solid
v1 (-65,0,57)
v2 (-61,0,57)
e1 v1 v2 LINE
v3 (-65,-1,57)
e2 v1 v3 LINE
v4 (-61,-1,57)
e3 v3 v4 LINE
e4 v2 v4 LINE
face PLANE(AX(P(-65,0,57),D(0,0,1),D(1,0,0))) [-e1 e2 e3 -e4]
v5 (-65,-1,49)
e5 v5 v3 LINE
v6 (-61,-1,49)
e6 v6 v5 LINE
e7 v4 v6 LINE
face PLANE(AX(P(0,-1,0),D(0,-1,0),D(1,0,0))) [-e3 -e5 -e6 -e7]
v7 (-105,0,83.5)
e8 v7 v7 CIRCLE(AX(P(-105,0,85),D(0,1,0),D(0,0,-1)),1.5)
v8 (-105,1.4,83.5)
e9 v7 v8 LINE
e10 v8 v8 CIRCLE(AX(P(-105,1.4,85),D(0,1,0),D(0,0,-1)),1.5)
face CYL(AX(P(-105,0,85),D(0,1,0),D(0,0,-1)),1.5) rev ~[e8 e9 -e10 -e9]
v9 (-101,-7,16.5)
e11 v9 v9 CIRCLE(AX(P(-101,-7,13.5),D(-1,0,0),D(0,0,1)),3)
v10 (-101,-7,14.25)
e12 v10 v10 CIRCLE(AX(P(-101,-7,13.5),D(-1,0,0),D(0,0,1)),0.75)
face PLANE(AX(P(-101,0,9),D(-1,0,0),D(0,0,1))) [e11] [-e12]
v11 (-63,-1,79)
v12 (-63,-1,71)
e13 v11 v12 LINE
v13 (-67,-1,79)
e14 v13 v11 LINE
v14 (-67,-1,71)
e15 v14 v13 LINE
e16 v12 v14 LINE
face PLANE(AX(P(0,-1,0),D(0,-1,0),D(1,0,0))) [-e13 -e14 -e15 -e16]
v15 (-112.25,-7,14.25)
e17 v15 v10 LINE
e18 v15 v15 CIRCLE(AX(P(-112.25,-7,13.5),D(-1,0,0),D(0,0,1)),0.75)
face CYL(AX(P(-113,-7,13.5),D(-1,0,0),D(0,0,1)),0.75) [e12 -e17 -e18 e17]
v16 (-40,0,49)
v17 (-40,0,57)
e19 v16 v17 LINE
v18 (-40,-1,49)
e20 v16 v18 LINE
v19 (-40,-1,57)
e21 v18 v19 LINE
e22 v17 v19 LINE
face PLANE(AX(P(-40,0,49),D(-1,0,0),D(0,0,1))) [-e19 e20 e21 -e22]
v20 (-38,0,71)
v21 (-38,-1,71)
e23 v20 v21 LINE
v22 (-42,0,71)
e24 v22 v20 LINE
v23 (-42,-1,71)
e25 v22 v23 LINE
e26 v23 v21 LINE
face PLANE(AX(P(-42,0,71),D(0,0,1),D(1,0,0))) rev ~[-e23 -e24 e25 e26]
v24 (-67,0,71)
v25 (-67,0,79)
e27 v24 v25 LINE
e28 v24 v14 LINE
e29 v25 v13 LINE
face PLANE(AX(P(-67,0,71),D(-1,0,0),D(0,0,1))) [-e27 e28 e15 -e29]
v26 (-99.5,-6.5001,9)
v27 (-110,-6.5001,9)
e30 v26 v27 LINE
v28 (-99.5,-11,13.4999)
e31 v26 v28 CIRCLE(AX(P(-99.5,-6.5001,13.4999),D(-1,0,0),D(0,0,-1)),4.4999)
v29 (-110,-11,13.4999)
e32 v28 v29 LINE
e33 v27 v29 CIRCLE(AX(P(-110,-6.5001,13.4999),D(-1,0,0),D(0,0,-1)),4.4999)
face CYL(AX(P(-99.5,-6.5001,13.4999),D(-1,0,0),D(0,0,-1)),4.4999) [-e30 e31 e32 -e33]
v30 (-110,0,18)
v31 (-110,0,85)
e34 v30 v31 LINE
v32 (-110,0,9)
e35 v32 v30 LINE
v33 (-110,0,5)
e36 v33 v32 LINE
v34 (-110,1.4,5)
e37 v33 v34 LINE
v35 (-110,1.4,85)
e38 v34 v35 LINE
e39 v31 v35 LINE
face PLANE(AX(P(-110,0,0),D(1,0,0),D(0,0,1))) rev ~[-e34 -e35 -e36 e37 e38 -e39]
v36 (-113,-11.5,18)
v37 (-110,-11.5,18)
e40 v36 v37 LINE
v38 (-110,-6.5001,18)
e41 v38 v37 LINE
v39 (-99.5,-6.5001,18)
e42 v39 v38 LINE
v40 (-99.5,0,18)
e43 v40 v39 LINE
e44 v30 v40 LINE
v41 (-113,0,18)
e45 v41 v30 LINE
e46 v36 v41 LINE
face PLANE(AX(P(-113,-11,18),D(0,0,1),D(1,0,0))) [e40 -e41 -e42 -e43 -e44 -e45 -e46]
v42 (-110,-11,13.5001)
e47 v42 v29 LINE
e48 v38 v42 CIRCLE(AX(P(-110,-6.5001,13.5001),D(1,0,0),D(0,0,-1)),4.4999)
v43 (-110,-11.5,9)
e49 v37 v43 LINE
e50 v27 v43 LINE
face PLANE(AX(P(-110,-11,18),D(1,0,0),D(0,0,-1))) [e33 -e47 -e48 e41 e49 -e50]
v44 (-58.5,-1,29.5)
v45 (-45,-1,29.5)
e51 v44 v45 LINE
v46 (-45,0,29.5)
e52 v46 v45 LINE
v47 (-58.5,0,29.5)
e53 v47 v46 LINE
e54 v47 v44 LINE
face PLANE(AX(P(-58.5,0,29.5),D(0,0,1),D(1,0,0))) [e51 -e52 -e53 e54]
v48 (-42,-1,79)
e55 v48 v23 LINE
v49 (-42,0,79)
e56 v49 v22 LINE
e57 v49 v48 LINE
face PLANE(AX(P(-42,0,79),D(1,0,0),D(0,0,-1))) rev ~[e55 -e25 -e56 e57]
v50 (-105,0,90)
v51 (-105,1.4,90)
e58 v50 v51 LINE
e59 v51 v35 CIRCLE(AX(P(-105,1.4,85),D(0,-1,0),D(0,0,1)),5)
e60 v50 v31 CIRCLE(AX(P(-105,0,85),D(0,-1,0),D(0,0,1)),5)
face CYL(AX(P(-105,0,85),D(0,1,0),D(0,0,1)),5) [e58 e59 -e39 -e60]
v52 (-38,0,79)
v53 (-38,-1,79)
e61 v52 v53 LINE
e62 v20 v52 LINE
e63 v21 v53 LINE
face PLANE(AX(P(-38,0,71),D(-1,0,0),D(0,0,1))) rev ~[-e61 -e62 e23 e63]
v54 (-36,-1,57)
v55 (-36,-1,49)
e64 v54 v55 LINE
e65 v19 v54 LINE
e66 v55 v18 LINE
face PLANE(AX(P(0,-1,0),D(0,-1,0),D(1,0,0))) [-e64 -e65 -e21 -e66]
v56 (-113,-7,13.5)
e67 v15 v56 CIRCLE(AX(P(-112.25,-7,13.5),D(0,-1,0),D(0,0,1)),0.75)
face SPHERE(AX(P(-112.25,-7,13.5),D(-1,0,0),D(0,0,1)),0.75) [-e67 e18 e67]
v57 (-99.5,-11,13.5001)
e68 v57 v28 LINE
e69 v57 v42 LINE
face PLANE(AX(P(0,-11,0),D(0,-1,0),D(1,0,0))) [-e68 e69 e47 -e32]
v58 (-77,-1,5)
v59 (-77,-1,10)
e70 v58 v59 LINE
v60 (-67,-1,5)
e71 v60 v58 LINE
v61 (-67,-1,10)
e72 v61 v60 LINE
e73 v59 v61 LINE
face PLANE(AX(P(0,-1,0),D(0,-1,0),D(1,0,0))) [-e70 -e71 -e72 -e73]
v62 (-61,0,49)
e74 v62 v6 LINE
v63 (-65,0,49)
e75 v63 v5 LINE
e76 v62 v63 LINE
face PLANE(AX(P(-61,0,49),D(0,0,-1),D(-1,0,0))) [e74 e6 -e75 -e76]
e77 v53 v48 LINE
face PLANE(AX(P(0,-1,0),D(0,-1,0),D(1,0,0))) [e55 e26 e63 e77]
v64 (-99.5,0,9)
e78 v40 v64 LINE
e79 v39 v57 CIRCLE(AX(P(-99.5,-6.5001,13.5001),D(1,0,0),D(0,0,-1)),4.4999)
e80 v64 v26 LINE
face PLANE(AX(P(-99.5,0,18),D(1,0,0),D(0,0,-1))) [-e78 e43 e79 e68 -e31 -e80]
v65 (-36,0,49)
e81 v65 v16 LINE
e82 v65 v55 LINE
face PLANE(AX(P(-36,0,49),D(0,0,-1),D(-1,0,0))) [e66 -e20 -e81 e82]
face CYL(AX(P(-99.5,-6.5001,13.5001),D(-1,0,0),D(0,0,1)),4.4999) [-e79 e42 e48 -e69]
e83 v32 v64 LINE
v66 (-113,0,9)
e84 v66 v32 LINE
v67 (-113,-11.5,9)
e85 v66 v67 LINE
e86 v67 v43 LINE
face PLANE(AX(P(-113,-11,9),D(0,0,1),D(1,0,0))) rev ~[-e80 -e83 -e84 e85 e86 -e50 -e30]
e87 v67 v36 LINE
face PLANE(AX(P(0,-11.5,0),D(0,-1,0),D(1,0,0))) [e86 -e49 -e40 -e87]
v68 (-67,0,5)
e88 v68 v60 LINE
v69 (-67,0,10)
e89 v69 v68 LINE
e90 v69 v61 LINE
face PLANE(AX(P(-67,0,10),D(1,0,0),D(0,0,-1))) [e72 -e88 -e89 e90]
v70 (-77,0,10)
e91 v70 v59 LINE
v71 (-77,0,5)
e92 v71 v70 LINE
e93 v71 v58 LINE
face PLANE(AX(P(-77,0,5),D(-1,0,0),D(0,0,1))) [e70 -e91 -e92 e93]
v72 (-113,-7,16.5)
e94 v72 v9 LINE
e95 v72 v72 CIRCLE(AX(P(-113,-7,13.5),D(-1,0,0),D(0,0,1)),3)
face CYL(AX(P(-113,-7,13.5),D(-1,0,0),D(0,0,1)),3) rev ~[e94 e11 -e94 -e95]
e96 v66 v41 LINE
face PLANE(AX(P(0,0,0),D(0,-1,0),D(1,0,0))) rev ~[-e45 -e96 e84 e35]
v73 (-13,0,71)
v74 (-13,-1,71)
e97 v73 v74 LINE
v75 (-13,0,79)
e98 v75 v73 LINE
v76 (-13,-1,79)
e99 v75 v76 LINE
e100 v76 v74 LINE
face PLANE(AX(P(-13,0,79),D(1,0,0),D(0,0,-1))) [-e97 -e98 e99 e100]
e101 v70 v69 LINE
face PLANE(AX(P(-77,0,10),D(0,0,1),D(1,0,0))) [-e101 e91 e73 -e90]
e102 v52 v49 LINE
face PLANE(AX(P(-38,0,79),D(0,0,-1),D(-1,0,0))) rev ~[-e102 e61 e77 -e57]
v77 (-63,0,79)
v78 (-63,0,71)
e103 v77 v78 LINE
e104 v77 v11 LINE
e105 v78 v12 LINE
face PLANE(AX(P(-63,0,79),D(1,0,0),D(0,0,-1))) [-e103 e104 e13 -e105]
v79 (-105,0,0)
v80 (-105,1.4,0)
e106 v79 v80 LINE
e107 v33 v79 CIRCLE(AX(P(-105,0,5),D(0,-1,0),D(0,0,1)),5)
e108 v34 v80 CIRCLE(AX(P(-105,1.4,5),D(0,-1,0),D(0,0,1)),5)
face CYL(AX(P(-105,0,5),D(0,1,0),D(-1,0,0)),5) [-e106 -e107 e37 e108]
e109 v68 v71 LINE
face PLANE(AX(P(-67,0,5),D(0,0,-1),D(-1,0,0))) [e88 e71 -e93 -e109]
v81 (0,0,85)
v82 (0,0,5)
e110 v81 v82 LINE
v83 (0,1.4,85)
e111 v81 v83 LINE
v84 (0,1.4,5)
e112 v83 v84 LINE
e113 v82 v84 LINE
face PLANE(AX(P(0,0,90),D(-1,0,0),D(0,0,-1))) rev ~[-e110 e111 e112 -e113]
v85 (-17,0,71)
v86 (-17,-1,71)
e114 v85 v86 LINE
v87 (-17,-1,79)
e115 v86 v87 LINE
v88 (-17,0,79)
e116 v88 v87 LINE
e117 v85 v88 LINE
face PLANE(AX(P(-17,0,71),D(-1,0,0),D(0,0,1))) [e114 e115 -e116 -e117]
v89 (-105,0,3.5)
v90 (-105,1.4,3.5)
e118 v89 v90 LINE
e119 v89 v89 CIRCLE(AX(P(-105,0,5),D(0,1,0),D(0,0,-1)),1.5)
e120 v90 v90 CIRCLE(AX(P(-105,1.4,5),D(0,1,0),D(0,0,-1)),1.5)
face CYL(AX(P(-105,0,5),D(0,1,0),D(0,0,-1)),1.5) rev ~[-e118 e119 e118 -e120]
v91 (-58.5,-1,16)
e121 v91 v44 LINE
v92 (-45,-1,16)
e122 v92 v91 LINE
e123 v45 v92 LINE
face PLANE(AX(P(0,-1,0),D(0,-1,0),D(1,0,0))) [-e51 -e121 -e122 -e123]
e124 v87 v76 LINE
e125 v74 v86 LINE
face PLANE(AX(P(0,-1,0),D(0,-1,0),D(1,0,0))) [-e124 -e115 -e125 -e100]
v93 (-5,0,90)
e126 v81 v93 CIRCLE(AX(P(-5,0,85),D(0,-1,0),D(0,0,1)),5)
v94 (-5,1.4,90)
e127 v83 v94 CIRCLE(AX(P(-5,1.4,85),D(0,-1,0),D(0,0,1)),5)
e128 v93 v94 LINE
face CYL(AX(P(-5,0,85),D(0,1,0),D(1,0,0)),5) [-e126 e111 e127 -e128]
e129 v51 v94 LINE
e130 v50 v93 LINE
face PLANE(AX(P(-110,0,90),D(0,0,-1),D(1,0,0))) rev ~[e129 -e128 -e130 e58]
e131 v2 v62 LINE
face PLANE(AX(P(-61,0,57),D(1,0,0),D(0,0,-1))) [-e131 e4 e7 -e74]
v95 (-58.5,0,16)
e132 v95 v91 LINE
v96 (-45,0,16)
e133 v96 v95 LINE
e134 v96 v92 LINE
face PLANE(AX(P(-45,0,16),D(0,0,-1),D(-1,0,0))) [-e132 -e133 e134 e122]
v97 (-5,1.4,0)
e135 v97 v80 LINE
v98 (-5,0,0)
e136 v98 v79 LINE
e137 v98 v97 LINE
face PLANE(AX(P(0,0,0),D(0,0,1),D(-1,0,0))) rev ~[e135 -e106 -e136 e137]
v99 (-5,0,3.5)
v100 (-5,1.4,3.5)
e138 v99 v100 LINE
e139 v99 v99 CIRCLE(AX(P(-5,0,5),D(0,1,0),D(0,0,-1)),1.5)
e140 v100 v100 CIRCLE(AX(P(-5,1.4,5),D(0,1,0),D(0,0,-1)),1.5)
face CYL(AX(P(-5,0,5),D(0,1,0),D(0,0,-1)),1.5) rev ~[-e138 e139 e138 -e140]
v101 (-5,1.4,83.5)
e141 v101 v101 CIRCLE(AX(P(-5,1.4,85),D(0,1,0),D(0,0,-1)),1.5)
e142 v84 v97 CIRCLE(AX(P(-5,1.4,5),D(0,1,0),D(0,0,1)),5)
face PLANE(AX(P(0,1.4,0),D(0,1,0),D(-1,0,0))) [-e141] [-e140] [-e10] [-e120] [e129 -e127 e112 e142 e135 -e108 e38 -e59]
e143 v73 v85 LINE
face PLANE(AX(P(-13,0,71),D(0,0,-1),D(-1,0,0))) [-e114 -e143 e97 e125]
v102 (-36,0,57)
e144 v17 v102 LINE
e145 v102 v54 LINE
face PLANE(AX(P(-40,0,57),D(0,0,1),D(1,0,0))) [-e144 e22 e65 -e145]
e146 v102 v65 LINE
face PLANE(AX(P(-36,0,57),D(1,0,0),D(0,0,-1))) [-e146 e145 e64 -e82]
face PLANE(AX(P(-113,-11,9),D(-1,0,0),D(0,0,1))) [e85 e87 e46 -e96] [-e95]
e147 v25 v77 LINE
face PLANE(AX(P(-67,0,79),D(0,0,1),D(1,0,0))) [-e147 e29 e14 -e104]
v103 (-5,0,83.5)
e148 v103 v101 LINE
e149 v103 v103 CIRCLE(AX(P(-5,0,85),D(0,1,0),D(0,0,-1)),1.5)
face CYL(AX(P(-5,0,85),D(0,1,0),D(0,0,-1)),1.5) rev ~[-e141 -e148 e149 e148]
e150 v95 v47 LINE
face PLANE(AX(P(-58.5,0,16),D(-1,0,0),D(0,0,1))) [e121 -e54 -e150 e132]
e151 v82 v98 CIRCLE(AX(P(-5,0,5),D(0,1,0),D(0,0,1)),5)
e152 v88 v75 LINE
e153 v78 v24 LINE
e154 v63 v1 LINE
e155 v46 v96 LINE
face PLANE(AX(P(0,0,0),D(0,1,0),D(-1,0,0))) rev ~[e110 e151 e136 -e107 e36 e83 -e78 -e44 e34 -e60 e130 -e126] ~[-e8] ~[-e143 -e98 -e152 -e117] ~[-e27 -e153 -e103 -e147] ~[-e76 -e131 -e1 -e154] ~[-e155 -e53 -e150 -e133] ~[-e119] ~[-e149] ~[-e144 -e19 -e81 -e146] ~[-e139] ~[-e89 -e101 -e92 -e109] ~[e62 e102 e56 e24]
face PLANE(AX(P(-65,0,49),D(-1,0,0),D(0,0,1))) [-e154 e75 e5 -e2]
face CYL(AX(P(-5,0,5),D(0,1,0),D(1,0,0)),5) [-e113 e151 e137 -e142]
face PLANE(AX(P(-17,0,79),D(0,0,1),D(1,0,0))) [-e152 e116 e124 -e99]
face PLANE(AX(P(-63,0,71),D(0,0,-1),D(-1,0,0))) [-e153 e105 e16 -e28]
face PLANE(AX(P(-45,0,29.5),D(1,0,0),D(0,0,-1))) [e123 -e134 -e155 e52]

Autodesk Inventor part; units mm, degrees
ref_plane "YZ Plane" through (0, 0, 0) normal (1, 0, 0) x (0, 1, 0)
ref_plane "XZ Plane" through (0, 0, 0) normal (0, 1, 0) x (-1, 0, 0)
ref_plane "XY Plane" through (0, 0, 0) normal (0, 0, 1) x (1, 0, 0)
sketch "草圖1" plane through (0, 0, 0) normal (0, 1, 0) x (-1, 0, 0)
  line L0 (0, 0) -> (110, 0)
  line L1 (110, 0) -> (110, 90)
  line L2 (110, 90) -> (0, 90)
  line L3 (0, 90) -> (0, 0)
  dimension "d0" = 110
  dimension "d1" = 90
extrude "擠出1" add sketch "草圖1" along normal blind 1.4
fillet "圓角1" radius 5 4 edges at (0, 0.7, 90) (0, 0.7, 0) (-110, 0.7, 90) (-110, 0.7, 0)
sketch "草圖2" plane through (0, 0, 0) normal (0, -1, 0) x (1, 0, 0)
  line L0 (-5, 0) -> (-105, 0) projected
  line L1 (0, 85) -> (0, 5) projected
  line L2 (-105, 90) -> (-5, 90) projected
  line L3 (-110, 5) -> (-110, 85) projected
  point P0 (0, 0)
  point P1 (-105, 85)
  point P2 (-105, 5)
  point P3 (-5, 85)
  point P4 (-5, 5)
  dimension "d5" = 5
  dimension "d6" = 5
  dimension "d7" = 5
  dimension "d8" = 5
hole "孔1" at (-105, 0, 85) at (-105, 0, 5) at (-5, 0, 85) at (-5, 0, 5) direction (0, 1, 0) diameter 3 end through all
sketch "草圖3" plane through (0, 0, 0) normal (0, -1, 0) x (1, 0, 0)
  line L0 (-5, 0) -> (-105, 0) projected
  line L1 (-110, 5) -> (-110, 85) projected
  line L2 (-113, 18) -> (-99.5, 18)
  line L3 (-99.5, 18) -> (-99.5, 9)
  line L4 (-99.5, 9) -> (-113, 9)
  line L5 (-113, 9) -> (-113, 18)
  point P0 (0, 0)
  dimension "d16" = 9
  dimension "d17" = 9
  dimension "d18" = 13.5
  dimension "d19" = 3
extrude "擠出2" add sketch "草圖3" along normal blind 11
sketch "草圖5" plane through (0, -11, 0) normal (0, -1, 0) x (1, 0, 0)
  line L0 (-113, 9) -> (-99.5, 9) projected
  line L1 (-113, 18) -> (-110, 18)
  line L2 (-110, 18) -> (-110, 9)
  line L3 (-110, 9) -> (-113, 9)
  line L4 (-113, 9) -> (-113, 18)
  point P0 (0, 0)
  dimension "d23" = 3
extrude "擠出3" add sketch "草圖5" along normal blind 0.5
fillet "圓角2" radius 4.5 2 edges at (-104.75, -11, 18) (-104.75, -11, 9)
sketch "草圖7" plane through (-113, 0, 9) normal (-1, 0, 0) x (0, 0, 1)
  line L0 (9, -11.5) -> (0, -11.5) projected
  circle A0 centre (4.5, -7) radius 3
  circle A1 centre (4.5, -7) radius 0.75
  point P0 (-9, 0)
  dimension "d35" = 4.5
  dimension "d36" = 1.5
  dimension "d37" = 6
extrude "擠出4" cut sketch "草圖7" against normal blind 12
fillet "圓角3" radius 0.75 1 edges at (-113, -7, 12.75)
sketch "草圖8" plane through (0, 0, 0) normal (0, -1, 0) x (1, 0, 0)
  line L0 (-5, 0) -> (-105, 0) projected
  line L1 (0, 85) -> (0, 5) projected
  line L2 (-105, 90) -> (-5, 90) projected
  line L3 (-110, 18) -> (-110, 85) projected
  line L4 (-58.5, 29.5) -> (-45, 29.5)
  line L5 (-45, 29.5) -> (-45, 16)
  line L6 (-45, 16) -> (-58.5, 16)
  line L7 (-58.5, 16) -> (-58.5, 29.5)
  line L8 (-77, 10) -> (-67, 10)
  line L9 (-67, 10) -> (-67, 5)
  line L10 (-67, 5) -> (-77, 5)
  line L11 (-77, 5) -> (-77, 10)
  line L12 (-17, 79) -> (-13, 79)
  line L13 (-13, 79) -> (-13, 71)
  line L14 (-13, 71) -> (-17, 71)
  line L15 (-17, 71) -> (-17, 79)
  line L16 (-38, 79) -> (-42, 79)
  line L17 (-42, 79) -> (-42, 71)
  line L18 (-42, 71) -> (-38, 71)
  line L19 (-38, 71) -> (-38, 79)
  line L20 (-63, 71) -> (-67, 71)
  line L21 (-67, 71) -> (-67, 79)
  line L22 (-67, 79) -> (-63, 79)
  line L23 (-63, 79) -> (-63, 71)
  line L24 (-40, 57) -> (-36, 57)
  line L25 (-36, 57) -> (-36, 49)
  line L26 (-36, 49) -> (-40, 49)
  line L27 (-40, 49) -> (-40, 57)
  line L28 (-65, 57) -> (-61, 57)
  line L29 (-61, 57) -> (-61, 49)
  line L30 (-61, 49) -> (-65, 49)
  line L31 (-65, 49) -> (-65, 57)
  point P0 (0, 0)
  dimension "d41" = 13.5
  dimension "d43" = 13.5
  dimension "d44" = 51.5
  dimension "d45" = 16
  dimension "d46" = 10
  dimension "d47" = 5
  dimension "d48" = 33
  dimension "d49" = 5
  dimension "d50" = 4
  dimension "d51" = 8
  dimension "d52" = 13
  dimension "d53" = 11
  dimension "d54" = 4
  dimension "d55" = 4
  dimension "d56" = 21
  dimension "d57" = 21
  dimension "d58" = 4
  dimension "d59" = 8
  dimension "d60" = 2
  dimension "d61" = 14
  dimension "d62" = 4
  dimension "d63" = 21
extrude "擠出5" add sketch "草圖8" along normal blind 1
properties part number "pcb"
